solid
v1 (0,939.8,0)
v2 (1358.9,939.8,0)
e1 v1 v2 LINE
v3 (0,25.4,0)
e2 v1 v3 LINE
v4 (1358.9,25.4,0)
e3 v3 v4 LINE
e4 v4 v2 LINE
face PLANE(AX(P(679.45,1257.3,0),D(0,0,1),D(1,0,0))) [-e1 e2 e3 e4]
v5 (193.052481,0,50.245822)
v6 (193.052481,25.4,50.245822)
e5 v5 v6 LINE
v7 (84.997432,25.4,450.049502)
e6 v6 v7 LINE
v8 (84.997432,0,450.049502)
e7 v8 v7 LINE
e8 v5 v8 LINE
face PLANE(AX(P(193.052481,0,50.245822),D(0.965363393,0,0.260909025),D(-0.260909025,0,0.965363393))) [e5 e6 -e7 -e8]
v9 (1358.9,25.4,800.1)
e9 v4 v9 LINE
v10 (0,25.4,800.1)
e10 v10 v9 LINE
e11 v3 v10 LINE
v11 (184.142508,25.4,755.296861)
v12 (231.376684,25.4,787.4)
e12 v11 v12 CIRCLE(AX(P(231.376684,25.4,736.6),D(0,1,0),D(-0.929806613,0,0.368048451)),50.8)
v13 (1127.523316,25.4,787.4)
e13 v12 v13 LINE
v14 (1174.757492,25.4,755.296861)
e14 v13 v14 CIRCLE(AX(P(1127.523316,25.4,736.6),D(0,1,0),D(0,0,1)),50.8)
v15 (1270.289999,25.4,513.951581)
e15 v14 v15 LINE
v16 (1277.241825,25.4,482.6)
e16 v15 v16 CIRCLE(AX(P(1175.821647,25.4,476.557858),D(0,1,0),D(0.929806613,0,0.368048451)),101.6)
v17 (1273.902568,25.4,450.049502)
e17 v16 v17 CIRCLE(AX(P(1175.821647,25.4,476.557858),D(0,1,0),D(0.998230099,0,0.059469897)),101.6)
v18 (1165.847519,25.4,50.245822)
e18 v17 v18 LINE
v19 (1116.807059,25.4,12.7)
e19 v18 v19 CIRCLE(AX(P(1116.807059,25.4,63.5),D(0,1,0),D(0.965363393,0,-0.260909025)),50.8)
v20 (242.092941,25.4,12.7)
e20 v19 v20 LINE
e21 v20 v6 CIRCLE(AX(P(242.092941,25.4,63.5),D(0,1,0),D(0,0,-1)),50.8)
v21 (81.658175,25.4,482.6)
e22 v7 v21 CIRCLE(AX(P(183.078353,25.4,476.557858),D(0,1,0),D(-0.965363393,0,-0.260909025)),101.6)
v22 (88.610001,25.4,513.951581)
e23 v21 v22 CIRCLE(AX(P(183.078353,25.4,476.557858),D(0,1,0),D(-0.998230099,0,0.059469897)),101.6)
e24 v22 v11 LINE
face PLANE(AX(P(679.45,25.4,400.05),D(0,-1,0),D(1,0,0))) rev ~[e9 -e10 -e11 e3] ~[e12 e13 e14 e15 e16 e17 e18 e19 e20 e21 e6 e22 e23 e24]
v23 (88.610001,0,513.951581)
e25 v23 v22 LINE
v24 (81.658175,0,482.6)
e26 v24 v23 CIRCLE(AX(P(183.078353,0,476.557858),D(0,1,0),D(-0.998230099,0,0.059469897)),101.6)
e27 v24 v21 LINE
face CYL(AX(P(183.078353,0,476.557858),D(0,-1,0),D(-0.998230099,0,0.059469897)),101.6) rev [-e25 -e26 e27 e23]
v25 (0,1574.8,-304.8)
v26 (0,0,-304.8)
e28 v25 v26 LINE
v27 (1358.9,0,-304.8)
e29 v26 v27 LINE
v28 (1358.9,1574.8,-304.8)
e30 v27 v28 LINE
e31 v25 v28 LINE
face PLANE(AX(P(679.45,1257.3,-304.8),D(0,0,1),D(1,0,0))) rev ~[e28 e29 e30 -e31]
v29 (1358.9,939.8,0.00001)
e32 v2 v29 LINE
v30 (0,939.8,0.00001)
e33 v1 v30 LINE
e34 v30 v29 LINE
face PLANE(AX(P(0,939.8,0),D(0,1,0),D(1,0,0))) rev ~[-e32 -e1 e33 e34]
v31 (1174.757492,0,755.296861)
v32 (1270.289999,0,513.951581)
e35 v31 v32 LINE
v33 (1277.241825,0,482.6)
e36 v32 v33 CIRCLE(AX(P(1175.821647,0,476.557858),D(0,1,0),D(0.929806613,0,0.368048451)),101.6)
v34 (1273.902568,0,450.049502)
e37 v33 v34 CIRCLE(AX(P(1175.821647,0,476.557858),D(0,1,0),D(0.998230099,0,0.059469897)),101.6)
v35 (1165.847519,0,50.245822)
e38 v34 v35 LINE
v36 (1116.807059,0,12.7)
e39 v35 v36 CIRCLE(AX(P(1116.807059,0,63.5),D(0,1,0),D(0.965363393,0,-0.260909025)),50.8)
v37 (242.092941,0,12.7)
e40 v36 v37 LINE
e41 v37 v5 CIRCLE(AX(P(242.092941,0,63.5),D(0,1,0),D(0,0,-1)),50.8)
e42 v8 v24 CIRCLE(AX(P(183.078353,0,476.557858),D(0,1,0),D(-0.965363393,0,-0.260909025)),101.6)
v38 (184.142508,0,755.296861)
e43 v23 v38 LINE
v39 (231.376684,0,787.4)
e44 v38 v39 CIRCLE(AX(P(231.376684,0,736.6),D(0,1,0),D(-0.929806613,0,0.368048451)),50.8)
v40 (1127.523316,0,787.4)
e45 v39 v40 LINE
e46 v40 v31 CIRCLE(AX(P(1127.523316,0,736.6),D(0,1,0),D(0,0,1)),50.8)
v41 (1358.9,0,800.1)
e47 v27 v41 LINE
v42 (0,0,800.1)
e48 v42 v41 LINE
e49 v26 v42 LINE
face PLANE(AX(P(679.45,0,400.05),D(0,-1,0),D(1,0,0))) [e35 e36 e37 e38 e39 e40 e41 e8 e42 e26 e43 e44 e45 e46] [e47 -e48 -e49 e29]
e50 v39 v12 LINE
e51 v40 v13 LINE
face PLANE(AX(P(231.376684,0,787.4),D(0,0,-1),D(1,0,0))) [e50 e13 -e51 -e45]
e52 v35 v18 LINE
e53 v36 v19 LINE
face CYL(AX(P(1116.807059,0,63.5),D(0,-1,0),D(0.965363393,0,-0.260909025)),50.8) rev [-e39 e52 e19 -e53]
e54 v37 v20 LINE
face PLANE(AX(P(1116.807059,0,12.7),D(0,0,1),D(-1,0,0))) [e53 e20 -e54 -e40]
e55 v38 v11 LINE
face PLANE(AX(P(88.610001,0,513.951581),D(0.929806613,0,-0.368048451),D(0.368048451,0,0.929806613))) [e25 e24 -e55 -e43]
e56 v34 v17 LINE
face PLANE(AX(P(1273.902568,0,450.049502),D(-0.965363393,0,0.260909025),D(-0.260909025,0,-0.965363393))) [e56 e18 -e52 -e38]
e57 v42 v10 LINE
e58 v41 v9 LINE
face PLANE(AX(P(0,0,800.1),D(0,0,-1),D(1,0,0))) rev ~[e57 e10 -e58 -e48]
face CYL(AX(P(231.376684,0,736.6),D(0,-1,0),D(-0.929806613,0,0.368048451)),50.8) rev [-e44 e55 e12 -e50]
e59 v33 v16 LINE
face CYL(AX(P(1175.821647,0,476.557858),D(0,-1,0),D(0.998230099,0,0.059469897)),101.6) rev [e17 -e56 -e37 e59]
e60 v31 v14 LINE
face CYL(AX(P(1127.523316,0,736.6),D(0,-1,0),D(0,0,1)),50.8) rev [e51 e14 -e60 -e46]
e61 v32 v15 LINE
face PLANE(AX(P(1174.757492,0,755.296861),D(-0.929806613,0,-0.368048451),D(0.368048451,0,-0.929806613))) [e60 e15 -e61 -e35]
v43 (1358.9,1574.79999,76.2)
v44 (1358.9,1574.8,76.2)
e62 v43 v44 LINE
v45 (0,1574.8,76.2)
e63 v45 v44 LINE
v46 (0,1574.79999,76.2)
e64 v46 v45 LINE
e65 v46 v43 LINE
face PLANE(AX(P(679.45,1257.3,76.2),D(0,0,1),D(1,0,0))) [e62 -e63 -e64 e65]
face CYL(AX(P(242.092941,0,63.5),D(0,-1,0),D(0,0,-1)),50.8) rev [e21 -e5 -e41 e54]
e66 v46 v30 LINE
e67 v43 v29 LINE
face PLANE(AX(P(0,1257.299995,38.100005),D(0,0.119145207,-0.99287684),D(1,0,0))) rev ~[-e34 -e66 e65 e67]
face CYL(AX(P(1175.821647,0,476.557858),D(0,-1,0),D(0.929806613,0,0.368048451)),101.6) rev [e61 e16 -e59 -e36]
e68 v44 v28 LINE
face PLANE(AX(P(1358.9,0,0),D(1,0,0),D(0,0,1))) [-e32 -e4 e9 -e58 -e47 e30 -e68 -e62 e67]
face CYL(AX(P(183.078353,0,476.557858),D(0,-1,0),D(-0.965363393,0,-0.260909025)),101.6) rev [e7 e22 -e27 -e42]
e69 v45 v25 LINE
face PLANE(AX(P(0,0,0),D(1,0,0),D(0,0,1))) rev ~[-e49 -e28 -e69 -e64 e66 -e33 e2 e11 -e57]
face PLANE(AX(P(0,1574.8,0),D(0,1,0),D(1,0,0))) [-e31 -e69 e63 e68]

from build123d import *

# Parameters (mm, degrees)
F0_W     = 1358.9
F0_H     = 635
F0_H_2   = 939.8
F1_DEPTH = 304.8
F2_DEPTH = 76.2
F3_SIZE2 = 76.19999
F3_SIZE  = 634.99999
F4_W     = 1358.9
F4_H     = 800.1
F5_DEPTH = 25.4


# Not quite as in the source:
# - a fillet or chamfer is up to 0.001 mm smaller than in the source, because OpenCascade refuses the exact size


with BuildPart() as f1:
    # F0 (on Top) → F1 (new body)
    with BuildSketch(Plane.XY):
        with Locations((679.45, 1257.3)):
            Rectangle(F0_W, F0_H)
        with Locations((679.45, 469.9)):
            Rectangle(F0_W, F0_H_2)
    extrude(amount=-F1_DEPTH)

    # F0 (on Top) → F2 (join)
    with BuildSketch(Plane.XY):
        with Locations((679.45, 1257.3)):
            Rectangle(F0_W, F0_H)
    extrude(amount=F2_DEPTH)

    # F3 (size 635 and 76.2 in the source; OpenCascade refuses exactly that, so slightly less here)
    f3_edges = [f1.edges().sort_by_distance(p)[0] for p in [
        (679.45, 939.8, 76.2),
    ]]
    f3_side = f1.faces().sort_by_distance((679.45, 1257.3, 76.2))[0]
    chamfer(f3_edges, length=F3_SIZE, length2=F3_SIZE2, reference=f3_side)

    # F4 (on face) → F5 (join)
    with BuildSketch(Plane.XZ):
        with Locations((679.45, 400.05)):
            Rectangle(F4_W, F4_H)
        with BuildLine():
            Line((1116.8070589646, 12.7), (242.0929410354, 12.7))
            ThreePointArc((242.0929410354, 12.7), (211.2114924509, 23.1642077886), (193.0524806695, 50.2458215227))
            Line((193.0524806695, 50.2458215227), (84.9974320158, 450.0495015416))
            ThreePointArc((84.9974320158, 450.0495015416), (82.0087933028, 466.189437514), (81.6581746464, 482.6))
            ThreePointArc((81.6581746464, 482.6), (83.887579714, 498.5521883341), (88.6100008594, 513.9515811185))
            Line((88.6100008594, 513.9515811185), (184.1425076023, 755.2968613112))
            ThreePointArc((184.1425076023, 755.2968613112), (202.8211285229, 778.6145245993), (231.3766835464, 787.4))
            Line((231.3766835464, 787.4), (1127.5233164536, 787.4))
            ThreePointArc((1127.5233164536, 787.4), (1156.0788714771, 778.6145245993), (1174.7574923977, 755.2968613112))
            Line((1174.7574923977, 755.2968613112), (1270.2899991406, 513.9515811185))
            ThreePointArc((1270.2899991406, 513.9515811185), (1275.012420286, 498.5521883341), (1277.2418253536, 482.6))
            ThreePointArc((1277.2418253536, 482.6), (1276.8912066972, 466.189437514), (1273.9025679842, 450.0495015416))
            Line((1273.9025679842, 450.0495015416), (1165.8475193305, 50.2458215227))
            ThreePointArc((1165.8475193305, 50.2458215227), (1147.6885075491, 23.1642077886), (1116.8070589646, 12.7))
        make_face(mode=Mode.SUBTRACT)
    extrude(amount=-F5_DEPTH)


solid = f1.part
